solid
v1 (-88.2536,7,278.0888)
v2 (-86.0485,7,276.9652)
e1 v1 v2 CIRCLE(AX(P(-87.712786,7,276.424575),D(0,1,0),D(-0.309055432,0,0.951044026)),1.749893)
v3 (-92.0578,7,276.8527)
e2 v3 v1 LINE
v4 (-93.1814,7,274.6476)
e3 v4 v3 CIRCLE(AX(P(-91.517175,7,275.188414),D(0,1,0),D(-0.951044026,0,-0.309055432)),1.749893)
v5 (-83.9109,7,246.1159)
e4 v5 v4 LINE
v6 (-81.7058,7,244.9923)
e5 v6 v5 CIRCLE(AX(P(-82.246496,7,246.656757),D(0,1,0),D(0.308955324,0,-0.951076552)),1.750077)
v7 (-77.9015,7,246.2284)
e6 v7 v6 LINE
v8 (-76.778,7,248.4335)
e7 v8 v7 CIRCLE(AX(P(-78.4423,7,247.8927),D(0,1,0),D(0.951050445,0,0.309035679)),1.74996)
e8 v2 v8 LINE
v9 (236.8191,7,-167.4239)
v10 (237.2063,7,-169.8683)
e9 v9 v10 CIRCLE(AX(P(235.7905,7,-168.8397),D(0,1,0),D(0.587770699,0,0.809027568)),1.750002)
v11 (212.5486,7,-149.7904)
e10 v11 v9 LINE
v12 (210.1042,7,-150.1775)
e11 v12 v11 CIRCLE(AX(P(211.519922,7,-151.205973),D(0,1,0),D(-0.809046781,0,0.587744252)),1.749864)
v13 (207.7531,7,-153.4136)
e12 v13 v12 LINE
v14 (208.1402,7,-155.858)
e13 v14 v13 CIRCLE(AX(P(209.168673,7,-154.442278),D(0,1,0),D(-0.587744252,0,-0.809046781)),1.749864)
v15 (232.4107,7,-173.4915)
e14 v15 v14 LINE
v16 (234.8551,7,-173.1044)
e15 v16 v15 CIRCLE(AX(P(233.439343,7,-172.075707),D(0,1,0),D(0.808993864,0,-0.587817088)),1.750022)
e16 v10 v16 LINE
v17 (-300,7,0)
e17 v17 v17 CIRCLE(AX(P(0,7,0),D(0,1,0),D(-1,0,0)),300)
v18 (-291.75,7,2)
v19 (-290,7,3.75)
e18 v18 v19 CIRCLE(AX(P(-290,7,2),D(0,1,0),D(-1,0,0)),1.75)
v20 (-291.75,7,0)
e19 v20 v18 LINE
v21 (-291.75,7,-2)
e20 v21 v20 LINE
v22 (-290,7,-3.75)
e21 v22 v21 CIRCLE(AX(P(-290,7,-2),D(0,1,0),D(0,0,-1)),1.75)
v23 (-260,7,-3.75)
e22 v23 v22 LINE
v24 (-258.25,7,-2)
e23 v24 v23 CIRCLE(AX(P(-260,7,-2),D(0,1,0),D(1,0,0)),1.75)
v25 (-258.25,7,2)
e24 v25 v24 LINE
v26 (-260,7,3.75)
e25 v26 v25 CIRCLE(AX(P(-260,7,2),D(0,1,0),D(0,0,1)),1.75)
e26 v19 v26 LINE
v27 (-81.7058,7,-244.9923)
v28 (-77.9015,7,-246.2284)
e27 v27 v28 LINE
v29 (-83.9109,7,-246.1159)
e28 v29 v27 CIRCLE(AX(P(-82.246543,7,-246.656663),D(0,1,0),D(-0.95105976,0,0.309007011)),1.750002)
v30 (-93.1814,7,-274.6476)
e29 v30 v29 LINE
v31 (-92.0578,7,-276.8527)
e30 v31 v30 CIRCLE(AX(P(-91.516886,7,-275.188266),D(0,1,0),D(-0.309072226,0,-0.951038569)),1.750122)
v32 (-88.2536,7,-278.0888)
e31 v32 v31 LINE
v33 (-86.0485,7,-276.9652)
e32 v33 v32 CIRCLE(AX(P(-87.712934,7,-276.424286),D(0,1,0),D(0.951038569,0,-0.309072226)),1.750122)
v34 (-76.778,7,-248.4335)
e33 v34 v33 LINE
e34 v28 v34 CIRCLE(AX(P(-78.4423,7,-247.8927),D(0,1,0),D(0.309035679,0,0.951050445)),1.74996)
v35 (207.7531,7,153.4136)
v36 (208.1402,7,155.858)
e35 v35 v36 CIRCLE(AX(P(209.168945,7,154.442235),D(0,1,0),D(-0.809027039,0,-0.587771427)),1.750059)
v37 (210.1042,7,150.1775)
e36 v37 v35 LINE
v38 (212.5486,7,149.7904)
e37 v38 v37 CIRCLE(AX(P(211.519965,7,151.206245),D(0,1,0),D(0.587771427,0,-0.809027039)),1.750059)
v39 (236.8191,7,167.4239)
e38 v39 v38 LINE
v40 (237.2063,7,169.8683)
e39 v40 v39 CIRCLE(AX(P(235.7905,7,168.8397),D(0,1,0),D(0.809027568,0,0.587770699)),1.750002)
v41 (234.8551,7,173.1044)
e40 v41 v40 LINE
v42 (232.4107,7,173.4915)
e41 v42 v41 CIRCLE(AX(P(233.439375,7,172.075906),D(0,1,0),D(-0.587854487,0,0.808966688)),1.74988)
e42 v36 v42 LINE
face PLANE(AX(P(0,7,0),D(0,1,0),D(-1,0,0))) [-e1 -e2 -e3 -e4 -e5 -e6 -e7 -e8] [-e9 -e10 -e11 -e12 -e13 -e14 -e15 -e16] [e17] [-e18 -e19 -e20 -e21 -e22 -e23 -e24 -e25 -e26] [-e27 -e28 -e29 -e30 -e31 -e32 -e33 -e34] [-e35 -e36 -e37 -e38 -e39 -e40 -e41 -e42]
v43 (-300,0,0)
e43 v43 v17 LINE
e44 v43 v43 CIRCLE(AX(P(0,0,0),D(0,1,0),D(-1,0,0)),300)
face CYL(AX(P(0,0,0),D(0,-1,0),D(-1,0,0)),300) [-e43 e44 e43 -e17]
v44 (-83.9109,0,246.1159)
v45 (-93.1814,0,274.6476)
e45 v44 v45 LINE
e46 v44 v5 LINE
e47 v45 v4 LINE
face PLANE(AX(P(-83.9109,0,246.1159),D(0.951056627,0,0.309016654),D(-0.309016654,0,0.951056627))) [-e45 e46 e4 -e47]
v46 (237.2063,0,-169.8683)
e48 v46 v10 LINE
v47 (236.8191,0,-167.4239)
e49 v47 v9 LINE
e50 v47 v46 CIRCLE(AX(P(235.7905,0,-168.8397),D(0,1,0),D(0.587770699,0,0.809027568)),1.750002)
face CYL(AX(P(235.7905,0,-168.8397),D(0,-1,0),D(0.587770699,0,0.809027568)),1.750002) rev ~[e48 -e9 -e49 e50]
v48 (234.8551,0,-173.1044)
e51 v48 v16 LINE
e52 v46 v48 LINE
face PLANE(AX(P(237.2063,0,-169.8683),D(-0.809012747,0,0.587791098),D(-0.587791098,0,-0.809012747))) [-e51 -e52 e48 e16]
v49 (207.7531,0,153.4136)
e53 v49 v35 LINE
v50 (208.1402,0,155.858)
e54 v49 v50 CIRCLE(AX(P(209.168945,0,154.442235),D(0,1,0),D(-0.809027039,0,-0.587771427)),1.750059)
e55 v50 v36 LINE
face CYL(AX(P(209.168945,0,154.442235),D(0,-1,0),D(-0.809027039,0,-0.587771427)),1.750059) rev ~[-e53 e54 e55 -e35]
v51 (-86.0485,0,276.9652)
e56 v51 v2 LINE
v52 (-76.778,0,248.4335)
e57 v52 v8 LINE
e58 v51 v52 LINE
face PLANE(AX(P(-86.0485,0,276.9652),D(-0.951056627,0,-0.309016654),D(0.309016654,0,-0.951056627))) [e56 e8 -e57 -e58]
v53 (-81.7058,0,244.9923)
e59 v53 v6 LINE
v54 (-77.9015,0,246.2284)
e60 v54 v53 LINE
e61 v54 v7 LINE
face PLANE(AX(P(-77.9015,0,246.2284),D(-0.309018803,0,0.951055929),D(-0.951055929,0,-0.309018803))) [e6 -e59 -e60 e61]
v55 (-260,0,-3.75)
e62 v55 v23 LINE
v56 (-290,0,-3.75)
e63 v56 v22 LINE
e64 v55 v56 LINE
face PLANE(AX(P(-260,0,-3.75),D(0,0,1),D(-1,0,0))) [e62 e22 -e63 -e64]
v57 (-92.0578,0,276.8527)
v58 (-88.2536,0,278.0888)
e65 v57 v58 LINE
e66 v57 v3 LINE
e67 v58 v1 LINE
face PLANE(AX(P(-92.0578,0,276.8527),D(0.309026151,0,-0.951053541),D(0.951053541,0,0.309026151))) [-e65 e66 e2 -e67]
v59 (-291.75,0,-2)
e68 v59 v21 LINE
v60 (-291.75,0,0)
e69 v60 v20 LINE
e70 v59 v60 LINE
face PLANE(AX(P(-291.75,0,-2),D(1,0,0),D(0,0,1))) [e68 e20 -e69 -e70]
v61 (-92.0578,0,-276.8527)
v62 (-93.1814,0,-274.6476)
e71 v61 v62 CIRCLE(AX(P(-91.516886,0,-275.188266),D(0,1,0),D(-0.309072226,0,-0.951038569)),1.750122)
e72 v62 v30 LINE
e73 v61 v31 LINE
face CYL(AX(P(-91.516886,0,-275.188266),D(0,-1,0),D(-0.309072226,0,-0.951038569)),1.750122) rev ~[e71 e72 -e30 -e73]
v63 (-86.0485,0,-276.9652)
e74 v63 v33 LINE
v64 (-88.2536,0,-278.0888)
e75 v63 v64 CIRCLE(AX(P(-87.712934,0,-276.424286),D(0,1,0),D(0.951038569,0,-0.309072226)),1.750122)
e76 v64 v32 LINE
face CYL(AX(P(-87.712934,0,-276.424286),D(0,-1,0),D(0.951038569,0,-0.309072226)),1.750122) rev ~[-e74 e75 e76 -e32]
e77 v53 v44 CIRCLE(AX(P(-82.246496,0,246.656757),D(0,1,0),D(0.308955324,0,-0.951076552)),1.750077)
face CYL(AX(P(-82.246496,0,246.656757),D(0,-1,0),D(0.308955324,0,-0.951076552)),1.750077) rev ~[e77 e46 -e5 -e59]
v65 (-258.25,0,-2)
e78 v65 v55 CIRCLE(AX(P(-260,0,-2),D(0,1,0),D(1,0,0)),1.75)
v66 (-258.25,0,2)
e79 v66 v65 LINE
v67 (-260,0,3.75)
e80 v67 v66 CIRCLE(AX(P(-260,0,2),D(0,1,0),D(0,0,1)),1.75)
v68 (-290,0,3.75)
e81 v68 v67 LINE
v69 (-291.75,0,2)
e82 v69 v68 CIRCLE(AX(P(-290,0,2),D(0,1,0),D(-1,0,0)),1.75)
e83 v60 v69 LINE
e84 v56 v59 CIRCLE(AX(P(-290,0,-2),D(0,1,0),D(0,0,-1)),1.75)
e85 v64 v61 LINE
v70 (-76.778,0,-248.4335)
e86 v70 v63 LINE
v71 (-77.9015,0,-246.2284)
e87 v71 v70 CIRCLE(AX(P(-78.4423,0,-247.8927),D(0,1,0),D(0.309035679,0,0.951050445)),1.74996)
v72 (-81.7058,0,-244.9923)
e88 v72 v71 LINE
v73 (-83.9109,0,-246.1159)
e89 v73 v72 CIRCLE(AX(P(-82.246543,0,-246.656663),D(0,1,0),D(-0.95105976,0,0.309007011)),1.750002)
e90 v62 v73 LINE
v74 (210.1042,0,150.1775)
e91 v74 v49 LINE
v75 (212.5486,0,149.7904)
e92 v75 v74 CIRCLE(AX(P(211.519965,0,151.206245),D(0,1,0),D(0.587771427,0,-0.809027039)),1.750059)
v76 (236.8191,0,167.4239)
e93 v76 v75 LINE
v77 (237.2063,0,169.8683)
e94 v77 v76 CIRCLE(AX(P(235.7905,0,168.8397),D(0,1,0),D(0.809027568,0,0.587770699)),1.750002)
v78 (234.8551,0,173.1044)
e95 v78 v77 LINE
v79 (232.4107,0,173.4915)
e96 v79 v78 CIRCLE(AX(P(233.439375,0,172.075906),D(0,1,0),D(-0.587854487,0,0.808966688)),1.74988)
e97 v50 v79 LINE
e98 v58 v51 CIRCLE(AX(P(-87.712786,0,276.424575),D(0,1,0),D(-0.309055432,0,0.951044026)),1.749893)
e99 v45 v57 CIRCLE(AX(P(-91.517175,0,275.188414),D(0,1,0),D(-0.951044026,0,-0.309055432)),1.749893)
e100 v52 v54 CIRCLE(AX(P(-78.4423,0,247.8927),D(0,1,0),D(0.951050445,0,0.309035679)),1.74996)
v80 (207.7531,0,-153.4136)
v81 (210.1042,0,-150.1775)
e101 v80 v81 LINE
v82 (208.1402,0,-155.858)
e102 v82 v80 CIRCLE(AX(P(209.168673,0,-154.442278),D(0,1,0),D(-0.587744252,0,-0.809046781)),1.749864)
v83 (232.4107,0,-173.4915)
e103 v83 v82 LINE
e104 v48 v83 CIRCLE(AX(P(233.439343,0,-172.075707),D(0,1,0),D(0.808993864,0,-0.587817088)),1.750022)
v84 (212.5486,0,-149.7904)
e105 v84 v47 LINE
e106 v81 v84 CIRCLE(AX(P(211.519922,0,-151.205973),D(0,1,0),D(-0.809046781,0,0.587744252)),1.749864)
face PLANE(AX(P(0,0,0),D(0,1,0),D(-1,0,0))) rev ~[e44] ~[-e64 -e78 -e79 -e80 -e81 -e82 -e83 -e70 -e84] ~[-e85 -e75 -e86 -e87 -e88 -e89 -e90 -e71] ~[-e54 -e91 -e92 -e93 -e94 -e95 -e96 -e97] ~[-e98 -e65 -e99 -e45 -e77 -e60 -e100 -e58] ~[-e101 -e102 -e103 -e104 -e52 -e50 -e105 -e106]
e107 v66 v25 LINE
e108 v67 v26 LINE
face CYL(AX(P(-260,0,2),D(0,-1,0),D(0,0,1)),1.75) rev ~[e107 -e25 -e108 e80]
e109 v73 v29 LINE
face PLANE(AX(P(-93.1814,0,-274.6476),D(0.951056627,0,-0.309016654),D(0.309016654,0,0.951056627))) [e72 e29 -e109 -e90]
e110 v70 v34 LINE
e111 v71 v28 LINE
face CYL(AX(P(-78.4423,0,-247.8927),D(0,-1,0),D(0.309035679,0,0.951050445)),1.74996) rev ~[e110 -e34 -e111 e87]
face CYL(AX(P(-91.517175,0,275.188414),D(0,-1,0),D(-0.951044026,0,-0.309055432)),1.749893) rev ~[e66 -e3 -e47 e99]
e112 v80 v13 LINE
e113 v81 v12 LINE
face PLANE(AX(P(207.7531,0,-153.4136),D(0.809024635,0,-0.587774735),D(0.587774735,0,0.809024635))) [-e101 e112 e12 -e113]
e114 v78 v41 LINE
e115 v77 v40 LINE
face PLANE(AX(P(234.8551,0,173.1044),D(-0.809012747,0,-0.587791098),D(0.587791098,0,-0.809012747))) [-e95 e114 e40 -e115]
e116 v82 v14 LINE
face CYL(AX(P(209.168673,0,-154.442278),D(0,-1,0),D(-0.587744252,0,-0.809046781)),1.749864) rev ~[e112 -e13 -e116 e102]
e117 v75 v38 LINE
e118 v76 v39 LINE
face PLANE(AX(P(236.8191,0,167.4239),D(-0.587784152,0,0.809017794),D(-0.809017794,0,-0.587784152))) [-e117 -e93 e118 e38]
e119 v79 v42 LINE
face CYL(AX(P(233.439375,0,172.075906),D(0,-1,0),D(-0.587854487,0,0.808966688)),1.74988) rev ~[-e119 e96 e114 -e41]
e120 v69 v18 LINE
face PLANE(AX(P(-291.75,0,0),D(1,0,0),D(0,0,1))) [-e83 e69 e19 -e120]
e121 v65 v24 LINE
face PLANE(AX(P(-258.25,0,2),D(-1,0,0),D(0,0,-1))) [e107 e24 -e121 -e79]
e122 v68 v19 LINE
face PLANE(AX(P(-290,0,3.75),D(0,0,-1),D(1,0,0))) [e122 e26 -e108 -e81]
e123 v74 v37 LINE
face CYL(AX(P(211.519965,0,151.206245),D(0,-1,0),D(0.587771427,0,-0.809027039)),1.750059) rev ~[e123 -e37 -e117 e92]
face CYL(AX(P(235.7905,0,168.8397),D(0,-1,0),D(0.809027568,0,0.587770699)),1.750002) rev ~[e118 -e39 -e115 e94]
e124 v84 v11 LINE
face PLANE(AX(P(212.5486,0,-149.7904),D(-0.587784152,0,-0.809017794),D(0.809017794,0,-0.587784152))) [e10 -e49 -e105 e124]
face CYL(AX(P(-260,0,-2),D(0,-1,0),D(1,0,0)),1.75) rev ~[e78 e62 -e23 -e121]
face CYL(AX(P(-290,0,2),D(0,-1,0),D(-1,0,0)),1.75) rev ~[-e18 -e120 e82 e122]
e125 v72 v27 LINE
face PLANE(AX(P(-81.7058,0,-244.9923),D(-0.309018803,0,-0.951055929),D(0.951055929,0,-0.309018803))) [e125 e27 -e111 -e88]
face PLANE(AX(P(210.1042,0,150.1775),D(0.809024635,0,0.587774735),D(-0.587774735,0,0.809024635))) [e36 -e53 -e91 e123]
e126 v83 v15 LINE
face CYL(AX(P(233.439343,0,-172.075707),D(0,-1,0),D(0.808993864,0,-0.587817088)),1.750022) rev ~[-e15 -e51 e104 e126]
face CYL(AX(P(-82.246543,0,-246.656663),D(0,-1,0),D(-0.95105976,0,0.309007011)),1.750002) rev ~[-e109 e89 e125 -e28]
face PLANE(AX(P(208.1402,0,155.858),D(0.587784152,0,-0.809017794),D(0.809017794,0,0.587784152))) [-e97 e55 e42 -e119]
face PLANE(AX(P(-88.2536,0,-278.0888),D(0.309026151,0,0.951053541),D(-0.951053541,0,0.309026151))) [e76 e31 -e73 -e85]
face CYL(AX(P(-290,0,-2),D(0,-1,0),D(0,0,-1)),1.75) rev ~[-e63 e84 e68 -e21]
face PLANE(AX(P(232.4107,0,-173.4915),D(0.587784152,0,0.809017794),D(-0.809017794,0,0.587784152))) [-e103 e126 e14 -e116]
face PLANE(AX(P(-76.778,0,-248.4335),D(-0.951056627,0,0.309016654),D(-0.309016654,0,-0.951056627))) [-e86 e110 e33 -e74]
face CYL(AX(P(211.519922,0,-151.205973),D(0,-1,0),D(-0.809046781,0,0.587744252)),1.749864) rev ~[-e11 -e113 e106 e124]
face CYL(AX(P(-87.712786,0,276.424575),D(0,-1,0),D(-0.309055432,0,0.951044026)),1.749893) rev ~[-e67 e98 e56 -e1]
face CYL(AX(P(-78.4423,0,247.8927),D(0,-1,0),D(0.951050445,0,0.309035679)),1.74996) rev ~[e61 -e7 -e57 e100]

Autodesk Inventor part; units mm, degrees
ref_plane "YZ Plane" through (0, 0, 0) normal (1, 0, 0) x (0, 1, 0)
ref_plane "XZ Plane" through (0, 0, 0) normal (0, 1, 0) x (-1, 0, 0)
ref_plane "XY Plane" through (0, 0, 0) normal (0, 0, 1) x (1, 0, 0)
sketch "Sketch1" plane through (0, 0, 0) normal (0, 1, 0) x (-1, 0, 0)
  circle A0 centre (0, 0) radius 300
  line L0 (290, 3.75) -> (260, 3.75)
  line L1 (260, -3.75) -> (290, -3.75)
  arc A1 (291.75, 2) -> (290, 3.75) centre (290, 2) ccw
  arc A2 (290, -3.75) -> (291.75, -2) centre (290, -2) ccw
  arc A3 (258.25, -2) -> (260, -3.75) centre (260, -2) ccw
  arc A4 (260, 3.75) -> (258.25, 2) centre (260, 2) ccw
  line L2 (258.25, 2) -> (258.25, -2)
  line L3 (291.75, -2) -> (291.75, 2)
  line L4 (306.241, 0) -> (300, 0)
  line L5 (300, 0) -> (281.7438, 0)
  line L6 (86.0485, 276.9652) -> (76.778, 248.4335)
  arc A5 (88.2536, 278.0888) -> (86.0485, 276.9652) centre (87.7128, 276.4244) ccw
  line L7 (92.0578, 276.8527) -> (88.2536, 278.0888)
  line L8 (83.9109, 246.1159) -> (93.1814, 274.6476)
  arc A6 (93.1814, 274.6476) -> (92.0578, 276.8527) centre (91.517, 275.1884) ccw
  arc A7 (76.778, 248.4335) -> (77.9015, 246.2284) centre (78.4423, 247.8927) ccw
  line L9 (77.9015, 246.2284) -> (81.7058, 244.9923)
  arc A8 (81.7058, 244.9923) -> (83.9109, 246.1159) centre (82.2465, 246.6567) ccw
  line L10 (-236.8191, 167.4239) -> (-212.5486, 149.7904)
  arc A9 (-237.2063, 169.8683) -> (-236.8191, 167.4239) centre (-235.7905, 168.8397) ccw
  line L11 (-234.8551, 173.1044) -> (-237.2063, 169.8683)
  line L12 (-208.1402, 155.858) -> (-232.4107, 173.4915)
  arc A10 (-232.4107, 173.4915) -> (-234.8551, 173.1044) centre (-233.4394, 172.0758) ccw
  arc A11 (-212.5486, 149.7904) -> (-210.1042, 150.1775) centre (-211.52, 151.2061) ccw
  line L13 (-210.1042, 150.1775) -> (-207.7531, 153.4136)
  arc A12 (-207.7531, 153.4136) -> (-208.1402, 155.858) centre (-209.1688, 154.4422) ccw
  line L14 (-232.4107, -173.4915) -> (-208.1402, -155.858)
  arc A13 (-234.8551, -173.1044) -> (-232.4107, -173.4915) centre (-233.4394, -172.0758) ccw
  line L15 (-237.2063, -169.8683) -> (-234.8551, -173.1044)
  line L16 (-212.5486, -149.7904) -> (-236.8191, -167.4239)
  arc A14 (-236.8191, -167.4239) -> (-237.2063, -169.8683) centre (-235.7905, -168.8397) ccw
  arc A15 (-208.1402, -155.858) -> (-207.7531, -153.4136) centre (-209.1688, -154.4422) ccw
  line L17 (-207.7531, -153.4136) -> (-210.1042, -150.1775)
  arc A16 (-210.1042, -150.1775) -> (-212.5486, -149.7904) centre (-211.52, -151.2061) ccw
  line L18 (93.1814, -274.6476) -> (83.9109, -246.1159)
  arc A17 (92.0578, -276.8527) -> (93.1814, -274.6476) centre (91.517, -275.1884) ccw
  line L19 (88.2536, -278.0888) -> (92.0578, -276.8527)
  line L20 (76.778, -248.4335) -> (86.0485, -276.9652)
  arc A18 (86.0485, -276.9652) -> (88.2536, -278.0888) centre (87.7128, -276.4244) ccw
  arc A19 (83.9109, -246.1159) -> (81.7058, -244.9923) centre (82.2465, -246.6567) ccw
  line L21 (81.7058, -244.9923) -> (77.9015, -246.2284)
  arc A20 (77.9015, -246.2284) -> (76.778, -248.4335) centre (78.4423, -247.8927) ccw
  point P0 (87.0636, 267.9543)
  point P1 (-227.9355, 165.6049)
  point P2 (-227.9355, -165.6049)
  point P3 (87.0636, -267.9543)
  dimension "d3" = 7.5
  dimension "d6" = 30
  dimension "d7" = 3.5
  dimension "d8" = 3.5
  dimension "d26" = 8.25
  dimension "d27" = 33.5
  dimension "d28" = 7.5
extrude "Extrusion1" add sketch "Sketch1" along normal blind 7
properties part number "Roof - V2"
